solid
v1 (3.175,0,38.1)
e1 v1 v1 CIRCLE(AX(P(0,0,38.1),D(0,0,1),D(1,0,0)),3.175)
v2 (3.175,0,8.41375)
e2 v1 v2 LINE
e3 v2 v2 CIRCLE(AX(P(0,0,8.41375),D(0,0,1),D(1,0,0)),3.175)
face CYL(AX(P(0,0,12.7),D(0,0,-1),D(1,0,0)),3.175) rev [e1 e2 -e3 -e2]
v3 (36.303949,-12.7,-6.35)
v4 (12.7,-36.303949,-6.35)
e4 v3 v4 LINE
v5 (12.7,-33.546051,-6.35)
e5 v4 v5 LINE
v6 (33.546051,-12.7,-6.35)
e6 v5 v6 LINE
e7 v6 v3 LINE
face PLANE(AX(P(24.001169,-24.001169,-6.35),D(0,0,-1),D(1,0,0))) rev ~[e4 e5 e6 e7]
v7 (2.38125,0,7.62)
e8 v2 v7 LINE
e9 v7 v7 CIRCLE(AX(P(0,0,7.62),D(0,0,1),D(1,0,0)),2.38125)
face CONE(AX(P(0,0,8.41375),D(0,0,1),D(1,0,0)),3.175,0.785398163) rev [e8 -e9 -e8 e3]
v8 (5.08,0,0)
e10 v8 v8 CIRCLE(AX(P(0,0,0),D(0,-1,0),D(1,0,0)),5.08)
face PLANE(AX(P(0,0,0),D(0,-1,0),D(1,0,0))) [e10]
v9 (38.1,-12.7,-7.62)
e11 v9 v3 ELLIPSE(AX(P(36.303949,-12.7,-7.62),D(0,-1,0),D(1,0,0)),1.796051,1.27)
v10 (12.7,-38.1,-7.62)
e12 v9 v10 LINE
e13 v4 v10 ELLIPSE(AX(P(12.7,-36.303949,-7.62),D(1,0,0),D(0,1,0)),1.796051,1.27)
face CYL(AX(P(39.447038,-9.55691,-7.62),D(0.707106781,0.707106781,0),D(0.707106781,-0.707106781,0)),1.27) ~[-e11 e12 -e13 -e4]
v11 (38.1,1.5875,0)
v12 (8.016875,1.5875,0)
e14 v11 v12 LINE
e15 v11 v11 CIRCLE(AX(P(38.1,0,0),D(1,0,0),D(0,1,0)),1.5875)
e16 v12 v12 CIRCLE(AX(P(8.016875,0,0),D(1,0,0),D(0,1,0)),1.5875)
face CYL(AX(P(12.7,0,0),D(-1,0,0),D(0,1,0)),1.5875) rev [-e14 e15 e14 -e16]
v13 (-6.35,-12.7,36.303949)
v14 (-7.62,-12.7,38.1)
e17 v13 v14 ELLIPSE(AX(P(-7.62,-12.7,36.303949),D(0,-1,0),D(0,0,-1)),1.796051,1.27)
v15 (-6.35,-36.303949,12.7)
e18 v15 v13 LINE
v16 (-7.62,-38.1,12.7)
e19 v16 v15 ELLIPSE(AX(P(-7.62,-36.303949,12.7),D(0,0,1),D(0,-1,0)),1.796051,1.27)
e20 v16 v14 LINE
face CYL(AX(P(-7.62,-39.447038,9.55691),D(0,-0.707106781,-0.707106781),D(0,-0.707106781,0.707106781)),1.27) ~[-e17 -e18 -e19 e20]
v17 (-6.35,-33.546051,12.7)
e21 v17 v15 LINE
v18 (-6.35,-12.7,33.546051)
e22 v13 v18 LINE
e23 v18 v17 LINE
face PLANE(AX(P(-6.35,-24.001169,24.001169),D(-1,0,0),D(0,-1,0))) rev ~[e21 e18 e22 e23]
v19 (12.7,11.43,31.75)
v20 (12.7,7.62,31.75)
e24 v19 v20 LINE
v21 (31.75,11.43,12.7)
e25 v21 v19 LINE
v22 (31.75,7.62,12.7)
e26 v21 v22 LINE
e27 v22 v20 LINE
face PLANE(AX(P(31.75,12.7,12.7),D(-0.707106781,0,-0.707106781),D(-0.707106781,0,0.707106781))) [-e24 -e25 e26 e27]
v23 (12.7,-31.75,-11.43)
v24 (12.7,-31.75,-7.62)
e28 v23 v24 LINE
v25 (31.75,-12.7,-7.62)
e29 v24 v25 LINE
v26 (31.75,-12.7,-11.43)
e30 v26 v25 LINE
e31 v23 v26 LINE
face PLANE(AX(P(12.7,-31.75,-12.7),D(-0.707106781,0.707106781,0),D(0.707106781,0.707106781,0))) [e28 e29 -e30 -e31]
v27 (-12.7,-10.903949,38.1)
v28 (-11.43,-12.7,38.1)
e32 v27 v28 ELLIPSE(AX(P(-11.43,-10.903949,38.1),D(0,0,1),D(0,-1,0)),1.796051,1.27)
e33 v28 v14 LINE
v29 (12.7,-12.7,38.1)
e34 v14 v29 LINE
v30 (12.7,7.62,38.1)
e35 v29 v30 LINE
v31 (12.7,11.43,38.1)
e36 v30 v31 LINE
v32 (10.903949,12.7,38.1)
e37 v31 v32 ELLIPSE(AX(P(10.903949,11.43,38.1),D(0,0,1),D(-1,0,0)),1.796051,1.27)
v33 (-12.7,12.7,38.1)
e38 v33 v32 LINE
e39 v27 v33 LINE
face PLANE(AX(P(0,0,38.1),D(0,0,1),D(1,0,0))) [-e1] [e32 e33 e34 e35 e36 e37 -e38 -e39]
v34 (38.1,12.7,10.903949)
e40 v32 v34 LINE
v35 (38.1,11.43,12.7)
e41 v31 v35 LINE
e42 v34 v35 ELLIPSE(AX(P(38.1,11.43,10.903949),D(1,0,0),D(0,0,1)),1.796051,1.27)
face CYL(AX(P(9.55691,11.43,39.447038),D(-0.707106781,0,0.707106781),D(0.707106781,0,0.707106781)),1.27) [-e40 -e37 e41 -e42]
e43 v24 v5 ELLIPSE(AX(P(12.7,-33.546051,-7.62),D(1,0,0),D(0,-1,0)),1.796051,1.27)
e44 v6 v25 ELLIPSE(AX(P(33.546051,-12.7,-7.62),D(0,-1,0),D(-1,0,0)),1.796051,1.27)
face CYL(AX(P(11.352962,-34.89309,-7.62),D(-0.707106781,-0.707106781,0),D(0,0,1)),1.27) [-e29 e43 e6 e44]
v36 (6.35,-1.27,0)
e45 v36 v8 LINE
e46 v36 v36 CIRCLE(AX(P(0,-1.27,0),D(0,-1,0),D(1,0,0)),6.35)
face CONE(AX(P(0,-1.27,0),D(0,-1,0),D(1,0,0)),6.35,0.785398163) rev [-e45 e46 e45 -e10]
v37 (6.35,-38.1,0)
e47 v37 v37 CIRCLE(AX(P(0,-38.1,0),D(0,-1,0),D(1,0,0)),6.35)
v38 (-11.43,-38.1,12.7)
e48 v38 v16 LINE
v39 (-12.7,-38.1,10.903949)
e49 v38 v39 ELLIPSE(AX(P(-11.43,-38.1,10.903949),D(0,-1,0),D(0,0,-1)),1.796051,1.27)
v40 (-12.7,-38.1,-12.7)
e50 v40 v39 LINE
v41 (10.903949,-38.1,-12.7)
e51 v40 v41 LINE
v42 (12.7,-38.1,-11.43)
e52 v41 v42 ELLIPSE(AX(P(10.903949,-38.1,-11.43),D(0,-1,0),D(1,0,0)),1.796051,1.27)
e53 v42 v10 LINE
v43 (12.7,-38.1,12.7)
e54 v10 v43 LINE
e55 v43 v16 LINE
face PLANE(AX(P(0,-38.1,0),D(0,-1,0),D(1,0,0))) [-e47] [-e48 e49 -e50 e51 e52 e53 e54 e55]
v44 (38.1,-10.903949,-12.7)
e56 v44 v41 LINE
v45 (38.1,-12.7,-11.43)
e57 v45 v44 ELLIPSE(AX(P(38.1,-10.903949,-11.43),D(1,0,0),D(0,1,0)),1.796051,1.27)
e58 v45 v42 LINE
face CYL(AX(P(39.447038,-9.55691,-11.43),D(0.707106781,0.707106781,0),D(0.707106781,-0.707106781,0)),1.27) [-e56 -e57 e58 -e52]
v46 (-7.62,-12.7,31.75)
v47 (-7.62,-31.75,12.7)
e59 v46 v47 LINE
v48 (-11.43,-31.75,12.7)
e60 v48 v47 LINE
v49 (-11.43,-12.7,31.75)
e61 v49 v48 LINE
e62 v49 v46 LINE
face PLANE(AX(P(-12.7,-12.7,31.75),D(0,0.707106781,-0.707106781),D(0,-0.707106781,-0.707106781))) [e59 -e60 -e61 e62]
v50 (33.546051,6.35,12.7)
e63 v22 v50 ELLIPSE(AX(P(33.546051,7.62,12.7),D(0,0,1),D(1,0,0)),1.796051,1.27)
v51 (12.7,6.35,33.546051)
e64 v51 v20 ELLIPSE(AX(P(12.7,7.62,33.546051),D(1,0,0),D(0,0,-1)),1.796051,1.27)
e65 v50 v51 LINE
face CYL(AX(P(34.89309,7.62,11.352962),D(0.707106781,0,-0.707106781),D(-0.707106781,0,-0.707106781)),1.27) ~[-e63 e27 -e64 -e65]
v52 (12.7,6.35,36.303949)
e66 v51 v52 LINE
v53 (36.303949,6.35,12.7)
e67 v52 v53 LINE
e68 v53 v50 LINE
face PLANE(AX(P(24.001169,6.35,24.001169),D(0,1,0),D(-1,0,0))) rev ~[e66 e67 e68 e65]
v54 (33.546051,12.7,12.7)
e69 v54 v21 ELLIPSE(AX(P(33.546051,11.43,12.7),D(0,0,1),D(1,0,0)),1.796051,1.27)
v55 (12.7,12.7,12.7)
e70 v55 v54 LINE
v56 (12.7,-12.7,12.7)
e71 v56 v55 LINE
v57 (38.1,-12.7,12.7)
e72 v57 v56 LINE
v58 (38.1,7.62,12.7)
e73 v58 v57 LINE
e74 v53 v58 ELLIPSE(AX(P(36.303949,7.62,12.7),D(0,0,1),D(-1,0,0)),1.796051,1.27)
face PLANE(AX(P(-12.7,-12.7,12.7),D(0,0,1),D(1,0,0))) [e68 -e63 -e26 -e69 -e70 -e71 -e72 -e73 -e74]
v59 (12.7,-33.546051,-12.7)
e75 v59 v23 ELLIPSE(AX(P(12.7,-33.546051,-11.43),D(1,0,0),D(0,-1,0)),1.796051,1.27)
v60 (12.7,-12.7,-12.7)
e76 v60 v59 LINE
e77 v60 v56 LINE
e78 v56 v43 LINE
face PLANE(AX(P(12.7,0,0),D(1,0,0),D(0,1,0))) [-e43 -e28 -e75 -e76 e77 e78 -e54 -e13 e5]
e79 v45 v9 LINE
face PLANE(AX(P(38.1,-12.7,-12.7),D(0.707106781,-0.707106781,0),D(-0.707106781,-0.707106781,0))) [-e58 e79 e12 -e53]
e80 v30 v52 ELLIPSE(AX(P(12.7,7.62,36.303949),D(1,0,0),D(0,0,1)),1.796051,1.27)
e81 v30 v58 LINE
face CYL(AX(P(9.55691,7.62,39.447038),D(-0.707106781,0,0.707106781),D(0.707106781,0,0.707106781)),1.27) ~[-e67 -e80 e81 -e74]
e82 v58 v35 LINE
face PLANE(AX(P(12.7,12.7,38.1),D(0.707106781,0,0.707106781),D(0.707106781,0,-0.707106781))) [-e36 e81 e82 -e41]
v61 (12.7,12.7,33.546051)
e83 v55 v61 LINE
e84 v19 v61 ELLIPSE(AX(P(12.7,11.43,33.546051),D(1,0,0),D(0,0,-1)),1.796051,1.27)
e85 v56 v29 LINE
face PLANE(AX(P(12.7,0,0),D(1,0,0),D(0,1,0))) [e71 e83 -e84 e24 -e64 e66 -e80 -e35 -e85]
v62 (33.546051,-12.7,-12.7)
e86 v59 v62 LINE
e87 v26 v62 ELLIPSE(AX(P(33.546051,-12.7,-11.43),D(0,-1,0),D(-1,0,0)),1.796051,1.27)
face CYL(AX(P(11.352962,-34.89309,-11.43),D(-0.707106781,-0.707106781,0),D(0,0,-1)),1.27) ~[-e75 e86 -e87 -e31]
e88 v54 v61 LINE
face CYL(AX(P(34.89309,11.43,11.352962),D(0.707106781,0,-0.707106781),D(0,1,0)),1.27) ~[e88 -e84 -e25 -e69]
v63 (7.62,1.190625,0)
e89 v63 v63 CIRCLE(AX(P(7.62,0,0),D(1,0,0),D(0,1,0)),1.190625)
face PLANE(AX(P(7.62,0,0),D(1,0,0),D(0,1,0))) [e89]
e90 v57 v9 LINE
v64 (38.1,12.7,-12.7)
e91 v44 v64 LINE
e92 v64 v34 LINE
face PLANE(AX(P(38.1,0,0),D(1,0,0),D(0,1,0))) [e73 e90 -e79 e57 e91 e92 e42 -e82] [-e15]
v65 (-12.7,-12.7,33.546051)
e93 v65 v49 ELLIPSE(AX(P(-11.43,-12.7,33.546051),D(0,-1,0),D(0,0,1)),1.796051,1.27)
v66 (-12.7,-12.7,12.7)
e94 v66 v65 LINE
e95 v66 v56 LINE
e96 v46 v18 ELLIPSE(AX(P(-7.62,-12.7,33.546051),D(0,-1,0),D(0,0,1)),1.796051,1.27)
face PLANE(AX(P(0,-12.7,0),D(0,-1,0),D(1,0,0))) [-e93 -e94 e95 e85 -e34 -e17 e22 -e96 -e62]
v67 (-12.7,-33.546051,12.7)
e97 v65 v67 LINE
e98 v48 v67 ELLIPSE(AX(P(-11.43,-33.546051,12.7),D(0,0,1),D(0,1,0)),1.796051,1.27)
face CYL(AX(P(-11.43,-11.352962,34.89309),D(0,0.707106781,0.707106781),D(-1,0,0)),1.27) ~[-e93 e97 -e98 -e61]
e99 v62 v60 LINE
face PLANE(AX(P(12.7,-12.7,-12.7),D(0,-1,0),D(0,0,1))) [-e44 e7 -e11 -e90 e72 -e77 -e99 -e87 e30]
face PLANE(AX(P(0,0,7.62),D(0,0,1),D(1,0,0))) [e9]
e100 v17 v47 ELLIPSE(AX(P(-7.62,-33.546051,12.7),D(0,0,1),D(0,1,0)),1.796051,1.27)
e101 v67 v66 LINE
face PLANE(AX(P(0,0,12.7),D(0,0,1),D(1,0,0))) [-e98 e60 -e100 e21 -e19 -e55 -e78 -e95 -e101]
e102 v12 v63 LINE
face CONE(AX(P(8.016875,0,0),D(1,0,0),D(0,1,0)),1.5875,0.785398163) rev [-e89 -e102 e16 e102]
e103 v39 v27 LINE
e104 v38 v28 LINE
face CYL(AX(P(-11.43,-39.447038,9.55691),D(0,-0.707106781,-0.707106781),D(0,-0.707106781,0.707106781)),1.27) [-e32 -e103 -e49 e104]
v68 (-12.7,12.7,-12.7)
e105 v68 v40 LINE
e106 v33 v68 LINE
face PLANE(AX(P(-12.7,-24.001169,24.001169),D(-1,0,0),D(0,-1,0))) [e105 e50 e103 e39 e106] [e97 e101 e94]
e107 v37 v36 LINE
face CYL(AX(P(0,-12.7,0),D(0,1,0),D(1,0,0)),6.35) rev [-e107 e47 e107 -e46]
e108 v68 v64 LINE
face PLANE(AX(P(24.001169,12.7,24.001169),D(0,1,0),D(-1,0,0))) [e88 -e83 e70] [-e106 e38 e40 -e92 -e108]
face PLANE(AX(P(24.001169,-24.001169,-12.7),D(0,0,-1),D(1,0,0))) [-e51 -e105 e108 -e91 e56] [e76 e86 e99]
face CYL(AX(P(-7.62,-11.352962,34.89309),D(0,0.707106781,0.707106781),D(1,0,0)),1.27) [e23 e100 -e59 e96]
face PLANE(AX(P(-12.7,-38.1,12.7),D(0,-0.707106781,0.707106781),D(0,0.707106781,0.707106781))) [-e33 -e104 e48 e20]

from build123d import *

# Parameters (mm, degrees)
F0_W          = 25.4
F0_H          = 25.4
F1_DEPTH      = 12.7
F2_R          = 3.175
F3_DEPTH      = 5.08
F4_R          = 1.5875
F5_DEPTH      = 5.08
F6_R          = 6.35
F7_DEPTH      = 12.7
F8_SIZE       = 1.27
F9_SIZE       = 0.396875
F10_SIZE      = 0.79375
F11_W         = 25.4
F11_H         = 25.4
F11_R         = 1.5875
F12_DEPTH     = 25.4
F13_W         = 25.4
F13_H         = 25.4
F13_R         = 6.35
F14_DEPTH     = 25.4
F15_W         = 25.4
F15_H         = 25.4
F15_R         = 3.175
F16_DEPTH     = 25.4
F18_DEPTH     = 6.35
F20_DEPTH     = 6.35
F22_DEPTH     = 6.35
F23_T1_DEPTH  = 42.2710244843
F23_T3_DEPTH  = 42.2710244843
F23_T5_DEPTH  = 42.2710244843
F23_T10_DEPTH = 42.2710244843
F23_T16_DEPTH = 33.2907683632
F23_T22_DEPTH = 33.2907683632
F23_T28_DEPTH = 42.2710244843
F23_T34_DEPTH = 33.2907683632
F23_T40_DEPTH = 33.2907683632
F23_T46_DEPTH = 42.2710244843
F23_T52_DEPTH = 33.2907683632
F23_T58_DEPTH = 33.2907683632


# Not quite as in the source:
# - a fillet or chamfer that OpenCascade refuses, or shapes differently, is made with other operations: its cross-section is extruded or revolved along the edge and cut away or added


with BuildPart() as f1:
    # F0 (on Top) → F1 (new body, symmetric)
    with BuildSketch(Plane.XY):
        Rectangle(F0_W, F0_H)
    extrude(amount=F1_DEPTH, both=True)

    # F2 (on face) → F3 (cut)
    with BuildSketch(Plane.XY.offset(12.7)):
        Circle(F2_R)
    extrude(amount=-F3_DEPTH, mode=Mode.SUBTRACT)

    # F4 (on face) → F5 (cut)
    with BuildSketch(Plane.YZ.offset(12.7)):
        Circle(F4_R)
    extrude(amount=-F5_DEPTH, mode=Mode.SUBTRACT)

    # F6 (on face) → F7 (cut)
    with BuildSketch(Plane.XZ.offset(12.7)):
        Circle(F6_R)
    extrude(amount=-F7_DEPTH, mode=Mode.SUBTRACT)

    # F8
    f8_edges = [f1.edges().sort_by_distance(p)[0] for p in [
        (-6.35, 0, 0),
    ]]
    chamfer(f8_edges, length=F8_SIZE)

    # F9
    f9_edges = [f1.edges().sort_by_distance(p)[0] for p in [
        (7.62, -1.5875, 0),
    ]]
    chamfer(f9_edges, length=F9_SIZE)

    # F10
    f10_edges = [f1.edges().sort_by_distance(p)[0] for p in [
        (-3.175, 0, 7.62),
    ]]
    chamfer(f10_edges, length=F10_SIZE)

    # F11 (on face) → F12 (join)
    with BuildSketch(Plane.YZ.offset(12.7)):
        Rectangle(F11_W, F11_H)
        Circle(F11_R, mode=Mode.SUBTRACT)
    extrude(amount=F12_DEPTH)

    # F13 (on face) → F14 (join)
    with BuildSketch(Plane.XZ.offset(12.7)):
        Rectangle(F13_W, F13_H)
        Circle(F13_R, mode=Mode.SUBTRACT)
    extrude(amount=F14_DEPTH)

    # F15 (on face) → F16 (join)
    with BuildSketch(Plane.XY.offset(12.7)):
        Rectangle(F15_W, F15_H)
        Circle(F15_R, mode=Mode.SUBTRACT)
    extrude(amount=F16_DEPTH)

    # F17 (on face) → F18 (join)
    with BuildSketch(Plane(origin=(0, 0, -12.7), x_dir=(1, 0, 0), z_dir=(0, 0, -1))):
        Polygon((38.1, 12.7), (12.7, 38.1), (12.7, 31.75), (31.75, 12.7), align=None)
    extrude(amount=-F18_DEPTH)

    # F19 (on face) → F20 (join)
    with BuildSketch(Plane(origin=(0, 12.7, 0), x_dir=(-1, 0, 0), z_dir=(0, 1, 0))):
        Polygon((-12.7, 38.1), (-38.1, 12.7), (-31.75, 12.7), (-12.7, 31.75), align=None)
    extrude(amount=-F20_DEPTH)

    # F21 (on face) → F22 (join)
    with BuildSketch(Plane(origin=(-12.7, 0, 0), x_dir=(0, -1, 0), z_dir=(-1, 0, 0))):
        Polygon((38.1, 12.7), (12.7, 38.1), (12.7, 31.75), (31.75, 12.7), align=None)
    extrude(amount=-F22_DEPTH)

    # F23: fillet of radius 1.27 on 12 edges, made by hand

    # F23_s2 → F23_t1 (cut)
    with BuildSketch(Plane(origin=(-14.9450640303, 0, 14.9450640303), x_dir=(0, 1, 0), z_dir=(0.7071067812, 0, -0.7071067812))):
        with BuildLine():
            ThreePointArc((11.43, 35.9210244843), (12.3280256121, 35.5490500964), (12.7, 34.6510244843))
            Line((12.7, 34.6510244843), (12.7, 35.9210244843))
            Line((12.7, 35.9210244843), (11.43, 35.9210244843))
        make_face()
    extrude(amount=F23_T1_DEPTH, mode=Mode.SUBTRACT)

    # F23_s4 → F23_t3 (cut)
    with BuildSketch(Plane(origin=(0, -14.9450640303, -14.9450640303), x_dir=(1, 0, 0), z_dir=(0, 0.7071067812, 0.7071067812))):
        with BuildLine():
            ThreePointArc((-11.43, -35.9210244843), (-12.3280256121, -35.5490500964), (-12.7, -34.6510244843))
            Line((-12.7, -34.6510244843), (-12.7, -35.9210244843))
            Line((-12.7, -35.9210244843), (-11.43, -35.9210244843))
        make_face()
    extrude(amount=F23_T3_DEPTH, mode=Mode.SUBTRACT)

    # F23_s6 → F23_t5 (cut)
    with BuildSketch(Plane(origin=(14.9450640303, 14.9450640303, 0), x_dir=(0, 0, 1), z_dir=(-0.7071067812, -0.7071067812, 0))):
        with BuildLine():
            ThreePointArc((-11.43, -35.9210244843), (-12.3280256121, -35.5490500964), (-12.7, -34.6510244843))
            Line((-12.7, -34.6510244843), (-12.7, -35.9210244843))
            Line((-12.7, -35.9210244843), (-11.43, -35.9210244843))
        make_face()
    extrude(amount=F23_T5_DEPTH, mode=Mode.SUBTRACT)


with BuildPart() as f23_tool8:
    # F23_s9 → F23_t10 (new body)
    with BuildSketch(Plane(origin=(-14.9450640303, 0, 14.9450640303), x_dir=(0, 1, 0), z_dir=(0.7071067812, 0, -0.7071067812))):
        with BuildLine():
            ThreePointArc((7.62, 35.9210244843), (6.7219743879, 35.5490500964), (6.35, 34.6510244843))
            Line((6.35, 34.6510244843), (6.35, 35.9210244843))
            Line((6.35, 35.9210244843), (7.62, 35.9210244843))
        make_face()
    extrude(amount=F23_T10_DEPTH)

    split(bisect_by=Plane.YZ.offset(12.7), keep=Keep.TOP)

    split(bisect_by=Plane.XY.offset(12.7), keep=Keep.TOP)


with BuildPart() as f1_1:
    add(f1.part)

    # F23_t7: cut F23_tool8
    add(f23_tool8.part, mode=Mode.SUBTRACT)


with BuildPart() as f23_tool14:
    # F23_s15 → F23_t16 (new body)
    with BuildSketch(Plane(origin=(11.7700640303, 0, -11.7700640303), x_dir=(0, 1, 0), z_dir=(-0.7071067812, 0, 0.7071067812))):
        with BuildLine():
            ThreePointArc((12.7, -32.7008964237), (12.3280256121, -31.8028708116), (11.43, -31.4308964237))
            Line((11.43, -31.4308964237), (12.7, -31.4308964237))
            Line((12.7, -31.4308964237), (12.7, -32.7008964237))
        make_face()
    extrude(amount=F23_T16_DEPTH)

    split(bisect_by=Plane.YZ.offset(12.7), keep=Keep.TOP)

    split(bisect_by=Plane.XY.offset(12.7), keep=Keep.TOP)


with BuildPart() as f1_2:
    add(f1_1.part)

    # F23_t13: cut F23_tool14
    add(f23_tool14.part, mode=Mode.SUBTRACT)


with BuildPart() as f23_tool20:
    # F23_s21 → F23_t22 (new body)
    with BuildSketch(Plane(origin=(11.7700640303, 0, -11.7700640303), x_dir=(0, 1, 0), z_dir=(-0.7071067812, 0, 0.7071067812))):
        with BuildLine():
            ThreePointArc((7.62, -31.4308964237), (6.7219743879, -31.8028708116), (6.35, -32.7008964237))
            Line((6.35, -32.7008964237), (6.35, -31.4308964237))
            Line((6.35, -31.4308964237), (7.62, -31.4308964237))
        make_face()
    extrude(amount=F23_T22_DEPTH)

    split(bisect_by=Plane.YZ.offset(12.7), keep=Keep.TOP)

    split(bisect_by=Plane.XY.offset(12.7), keep=Keep.TOP)


with BuildPart() as f1_3:
    add(f1_2.part)

    # F23_t19: cut F23_tool20
    add(f23_tool20.part, mode=Mode.SUBTRACT)


with BuildPart() as f23_tool26:
    # F23_s27 → F23_t28 (new body)
    with BuildSketch(Plane(origin=(0, -14.9450640303, -14.9450640303), x_dir=(1, 0, 0), z_dir=(0, 0.7071067812, 0.7071067812))):
        with BuildLine():
            ThreePointArc((-7.62, -35.9210244843), (-6.7219743879, -35.5490500964), (-6.35, -34.6510244843))
            Line((-6.35, -34.6510244843), (-6.35, -35.9210244843))
            Line((-6.35, -35.9210244843), (-7.62, -35.9210244843))
        make_face()
    extrude(amount=F23_T28_DEPTH)

    split(bisect_by=Plane.XZ.offset(12.7), keep=Keep.TOP)

    split(bisect_by=Plane.XY.offset(12.7), keep=Keep.TOP)


with BuildPart() as f1_4:
    add(f1_3.part)

    # F23_t25: cut F23_tool26
    add(f23_tool26.part, mode=Mode.SUBTRACT)


with BuildPart() as f23_tool32:
    # F23_s33 → F23_t34 (new body)
    with BuildSketch(Plane(origin=(0, 11.7700640303, 11.7700640303), x_dir=(1, 0, 0), z_dir=(0, -0.7071067812, -0.7071067812))):
        with BuildLine():
            ThreePointArc((-6.35, 32.7008964237), (-6.7219743879, 31.8028708116), (-7.62, 31.4308964237))
            Line((-7.62, 31.4308964237), (-6.35, 31.4308964237))
            Line((-6.35, 31.4308964237), (-6.35, 32.7008964237))
        make_face()
    extrude(amount=F23_T34_DEPTH)

    split(bisect_by=Plane.XZ.offset(12.7), keep=Keep.TOP)

    split(bisect_by=Plane.XY.offset(12.7), keep=Keep.TOP)


with BuildPart() as f1_5:
    add(f1_4.part)

    # F23_t31: cut F23_tool32
    add(f23_tool32.part, mode=Mode.SUBTRACT)


with BuildPart() as f23_tool38:
    # F23_s39 → F23_t40 (new body)
    with BuildSketch(Plane(origin=(0, 11.7700640303, 11.7700640303), x_dir=(1, 0, 0), z_dir=(0, -0.7071067812, -0.7071067812))):
        with BuildLine():
            ThreePointArc((-12.7, 32.7008964237), (-12.3280256121, 31.8028708116), (-11.43, 31.4308964237))
            Line((-11.43, 31.4308964237), (-12.7, 31.4308964237))
            Line((-12.7, 31.4308964237), (-12.7, 32.7008964237))
        make_face()
    extrude(amount=F23_T40_DEPTH)

    split(bisect_by=Plane.XZ.offset(12.7), keep=Keep.TOP)

    split(bisect_by=Plane.XY.offset(12.7), keep=Keep.TOP)


with BuildPart() as f1_6:
    add(f1_5.part)

    # F23_t37: cut F23_tool38
    add(f23_tool38.part, mode=Mode.SUBTRACT)


with BuildPart() as f23_tool44:
    # F23_s45 → F23_t46 (new body)
    with BuildSketch(Plane(origin=(14.9450640303, 14.9450640303, 0), x_dir=(0, 0, 1), z_dir=(-0.7071067812, -0.7071067812, 0))):
        with BuildLine():
            ThreePointArc((-7.62, -35.9210244843), (-6.7219743879, -35.5490500964), (-6.35, -34.6510244843))
            Line((-6.35, -34.6510244843), (-6.35, -35.9210244843))
            Line((-6.35, -35.9210244843), (-7.62, -35.9210244843))
        make_face()
    extrude(amount=F23_T46_DEPTH)

    split(bisect_by=Plane.YZ.offset(12.7), keep=Keep.TOP)

    split(bisect_by=Plane.XZ.offset(12.7), keep=Keep.TOP)


with BuildPart() as f1_7:
    add(f1_6.part)

    # F23_t43: cut F23_tool44
    add(f23_tool44.part, mode=Mode.SUBTRACT)


with BuildPart() as f23_tool50:
    # F23_s51 → F23_t52 (new body)
    with BuildSketch(Plane(origin=(-11.7700640303, -11.7700640303, 0), x_dir=(0, 0, 1), z_dir=(0.7071067812, 0.7071067812, 0))):
        with BuildLine():
            ThreePointArc((-12.7, 32.7008964237), (-12.3280256121, 31.8028708116), (-11.43, 31.4308964237))
            Line((-11.43, 31.4308964237), (-12.7, 31.4308964237))
            Line((-12.7, 31.4308964237), (-12.7, 32.7008964237))
        make_face()
    extrude(amount=F23_T52_DEPTH)

    split(bisect_by=Plane.YZ.offset(12.7), keep=Keep.TOP)

    split(bisect_by=Plane.XZ.offset(12.7), keep=Keep.TOP)


with BuildPart() as f1_8:
    add(f1_7.part)

    # F23_t49: cut F23_tool50
    add(f23_tool50.part, mode=Mode.SUBTRACT)


with BuildPart() as f23_tool56:
    # F23_s57 → F23_t58 (new body)
    with BuildSketch(Plane(origin=(-11.7700640303, -11.7700640303, 0), x_dir=(0, 0, 1), z_dir=(0.7071067812, 0.7071067812, 0))):
        with BuildLine():
            ThreePointArc((-6.35, 32.7008964237), (-6.7219743879, 31.8028708116), (-7.62, 31.4308964237))
            Line((-7.62, 31.4308964237), (-6.35, 31.4308964237))
            Line((-6.35, 31.4308964237), (-6.35, 32.7008964237))
        make_face()
    extrude(amount=F23_T58_DEPTH)

    split(bisect_by=Plane.YZ.offset(12.7), keep=Keep.TOP)

    split(bisect_by=Plane.XZ.offset(12.7), keep=Keep.TOP)


with BuildPart() as f1_9:
    add(f1_8.part)

    # F23_t55: cut F23_tool56
    add(f23_tool56.part, mode=Mode.SUBTRACT)


solid = f1_9.part
